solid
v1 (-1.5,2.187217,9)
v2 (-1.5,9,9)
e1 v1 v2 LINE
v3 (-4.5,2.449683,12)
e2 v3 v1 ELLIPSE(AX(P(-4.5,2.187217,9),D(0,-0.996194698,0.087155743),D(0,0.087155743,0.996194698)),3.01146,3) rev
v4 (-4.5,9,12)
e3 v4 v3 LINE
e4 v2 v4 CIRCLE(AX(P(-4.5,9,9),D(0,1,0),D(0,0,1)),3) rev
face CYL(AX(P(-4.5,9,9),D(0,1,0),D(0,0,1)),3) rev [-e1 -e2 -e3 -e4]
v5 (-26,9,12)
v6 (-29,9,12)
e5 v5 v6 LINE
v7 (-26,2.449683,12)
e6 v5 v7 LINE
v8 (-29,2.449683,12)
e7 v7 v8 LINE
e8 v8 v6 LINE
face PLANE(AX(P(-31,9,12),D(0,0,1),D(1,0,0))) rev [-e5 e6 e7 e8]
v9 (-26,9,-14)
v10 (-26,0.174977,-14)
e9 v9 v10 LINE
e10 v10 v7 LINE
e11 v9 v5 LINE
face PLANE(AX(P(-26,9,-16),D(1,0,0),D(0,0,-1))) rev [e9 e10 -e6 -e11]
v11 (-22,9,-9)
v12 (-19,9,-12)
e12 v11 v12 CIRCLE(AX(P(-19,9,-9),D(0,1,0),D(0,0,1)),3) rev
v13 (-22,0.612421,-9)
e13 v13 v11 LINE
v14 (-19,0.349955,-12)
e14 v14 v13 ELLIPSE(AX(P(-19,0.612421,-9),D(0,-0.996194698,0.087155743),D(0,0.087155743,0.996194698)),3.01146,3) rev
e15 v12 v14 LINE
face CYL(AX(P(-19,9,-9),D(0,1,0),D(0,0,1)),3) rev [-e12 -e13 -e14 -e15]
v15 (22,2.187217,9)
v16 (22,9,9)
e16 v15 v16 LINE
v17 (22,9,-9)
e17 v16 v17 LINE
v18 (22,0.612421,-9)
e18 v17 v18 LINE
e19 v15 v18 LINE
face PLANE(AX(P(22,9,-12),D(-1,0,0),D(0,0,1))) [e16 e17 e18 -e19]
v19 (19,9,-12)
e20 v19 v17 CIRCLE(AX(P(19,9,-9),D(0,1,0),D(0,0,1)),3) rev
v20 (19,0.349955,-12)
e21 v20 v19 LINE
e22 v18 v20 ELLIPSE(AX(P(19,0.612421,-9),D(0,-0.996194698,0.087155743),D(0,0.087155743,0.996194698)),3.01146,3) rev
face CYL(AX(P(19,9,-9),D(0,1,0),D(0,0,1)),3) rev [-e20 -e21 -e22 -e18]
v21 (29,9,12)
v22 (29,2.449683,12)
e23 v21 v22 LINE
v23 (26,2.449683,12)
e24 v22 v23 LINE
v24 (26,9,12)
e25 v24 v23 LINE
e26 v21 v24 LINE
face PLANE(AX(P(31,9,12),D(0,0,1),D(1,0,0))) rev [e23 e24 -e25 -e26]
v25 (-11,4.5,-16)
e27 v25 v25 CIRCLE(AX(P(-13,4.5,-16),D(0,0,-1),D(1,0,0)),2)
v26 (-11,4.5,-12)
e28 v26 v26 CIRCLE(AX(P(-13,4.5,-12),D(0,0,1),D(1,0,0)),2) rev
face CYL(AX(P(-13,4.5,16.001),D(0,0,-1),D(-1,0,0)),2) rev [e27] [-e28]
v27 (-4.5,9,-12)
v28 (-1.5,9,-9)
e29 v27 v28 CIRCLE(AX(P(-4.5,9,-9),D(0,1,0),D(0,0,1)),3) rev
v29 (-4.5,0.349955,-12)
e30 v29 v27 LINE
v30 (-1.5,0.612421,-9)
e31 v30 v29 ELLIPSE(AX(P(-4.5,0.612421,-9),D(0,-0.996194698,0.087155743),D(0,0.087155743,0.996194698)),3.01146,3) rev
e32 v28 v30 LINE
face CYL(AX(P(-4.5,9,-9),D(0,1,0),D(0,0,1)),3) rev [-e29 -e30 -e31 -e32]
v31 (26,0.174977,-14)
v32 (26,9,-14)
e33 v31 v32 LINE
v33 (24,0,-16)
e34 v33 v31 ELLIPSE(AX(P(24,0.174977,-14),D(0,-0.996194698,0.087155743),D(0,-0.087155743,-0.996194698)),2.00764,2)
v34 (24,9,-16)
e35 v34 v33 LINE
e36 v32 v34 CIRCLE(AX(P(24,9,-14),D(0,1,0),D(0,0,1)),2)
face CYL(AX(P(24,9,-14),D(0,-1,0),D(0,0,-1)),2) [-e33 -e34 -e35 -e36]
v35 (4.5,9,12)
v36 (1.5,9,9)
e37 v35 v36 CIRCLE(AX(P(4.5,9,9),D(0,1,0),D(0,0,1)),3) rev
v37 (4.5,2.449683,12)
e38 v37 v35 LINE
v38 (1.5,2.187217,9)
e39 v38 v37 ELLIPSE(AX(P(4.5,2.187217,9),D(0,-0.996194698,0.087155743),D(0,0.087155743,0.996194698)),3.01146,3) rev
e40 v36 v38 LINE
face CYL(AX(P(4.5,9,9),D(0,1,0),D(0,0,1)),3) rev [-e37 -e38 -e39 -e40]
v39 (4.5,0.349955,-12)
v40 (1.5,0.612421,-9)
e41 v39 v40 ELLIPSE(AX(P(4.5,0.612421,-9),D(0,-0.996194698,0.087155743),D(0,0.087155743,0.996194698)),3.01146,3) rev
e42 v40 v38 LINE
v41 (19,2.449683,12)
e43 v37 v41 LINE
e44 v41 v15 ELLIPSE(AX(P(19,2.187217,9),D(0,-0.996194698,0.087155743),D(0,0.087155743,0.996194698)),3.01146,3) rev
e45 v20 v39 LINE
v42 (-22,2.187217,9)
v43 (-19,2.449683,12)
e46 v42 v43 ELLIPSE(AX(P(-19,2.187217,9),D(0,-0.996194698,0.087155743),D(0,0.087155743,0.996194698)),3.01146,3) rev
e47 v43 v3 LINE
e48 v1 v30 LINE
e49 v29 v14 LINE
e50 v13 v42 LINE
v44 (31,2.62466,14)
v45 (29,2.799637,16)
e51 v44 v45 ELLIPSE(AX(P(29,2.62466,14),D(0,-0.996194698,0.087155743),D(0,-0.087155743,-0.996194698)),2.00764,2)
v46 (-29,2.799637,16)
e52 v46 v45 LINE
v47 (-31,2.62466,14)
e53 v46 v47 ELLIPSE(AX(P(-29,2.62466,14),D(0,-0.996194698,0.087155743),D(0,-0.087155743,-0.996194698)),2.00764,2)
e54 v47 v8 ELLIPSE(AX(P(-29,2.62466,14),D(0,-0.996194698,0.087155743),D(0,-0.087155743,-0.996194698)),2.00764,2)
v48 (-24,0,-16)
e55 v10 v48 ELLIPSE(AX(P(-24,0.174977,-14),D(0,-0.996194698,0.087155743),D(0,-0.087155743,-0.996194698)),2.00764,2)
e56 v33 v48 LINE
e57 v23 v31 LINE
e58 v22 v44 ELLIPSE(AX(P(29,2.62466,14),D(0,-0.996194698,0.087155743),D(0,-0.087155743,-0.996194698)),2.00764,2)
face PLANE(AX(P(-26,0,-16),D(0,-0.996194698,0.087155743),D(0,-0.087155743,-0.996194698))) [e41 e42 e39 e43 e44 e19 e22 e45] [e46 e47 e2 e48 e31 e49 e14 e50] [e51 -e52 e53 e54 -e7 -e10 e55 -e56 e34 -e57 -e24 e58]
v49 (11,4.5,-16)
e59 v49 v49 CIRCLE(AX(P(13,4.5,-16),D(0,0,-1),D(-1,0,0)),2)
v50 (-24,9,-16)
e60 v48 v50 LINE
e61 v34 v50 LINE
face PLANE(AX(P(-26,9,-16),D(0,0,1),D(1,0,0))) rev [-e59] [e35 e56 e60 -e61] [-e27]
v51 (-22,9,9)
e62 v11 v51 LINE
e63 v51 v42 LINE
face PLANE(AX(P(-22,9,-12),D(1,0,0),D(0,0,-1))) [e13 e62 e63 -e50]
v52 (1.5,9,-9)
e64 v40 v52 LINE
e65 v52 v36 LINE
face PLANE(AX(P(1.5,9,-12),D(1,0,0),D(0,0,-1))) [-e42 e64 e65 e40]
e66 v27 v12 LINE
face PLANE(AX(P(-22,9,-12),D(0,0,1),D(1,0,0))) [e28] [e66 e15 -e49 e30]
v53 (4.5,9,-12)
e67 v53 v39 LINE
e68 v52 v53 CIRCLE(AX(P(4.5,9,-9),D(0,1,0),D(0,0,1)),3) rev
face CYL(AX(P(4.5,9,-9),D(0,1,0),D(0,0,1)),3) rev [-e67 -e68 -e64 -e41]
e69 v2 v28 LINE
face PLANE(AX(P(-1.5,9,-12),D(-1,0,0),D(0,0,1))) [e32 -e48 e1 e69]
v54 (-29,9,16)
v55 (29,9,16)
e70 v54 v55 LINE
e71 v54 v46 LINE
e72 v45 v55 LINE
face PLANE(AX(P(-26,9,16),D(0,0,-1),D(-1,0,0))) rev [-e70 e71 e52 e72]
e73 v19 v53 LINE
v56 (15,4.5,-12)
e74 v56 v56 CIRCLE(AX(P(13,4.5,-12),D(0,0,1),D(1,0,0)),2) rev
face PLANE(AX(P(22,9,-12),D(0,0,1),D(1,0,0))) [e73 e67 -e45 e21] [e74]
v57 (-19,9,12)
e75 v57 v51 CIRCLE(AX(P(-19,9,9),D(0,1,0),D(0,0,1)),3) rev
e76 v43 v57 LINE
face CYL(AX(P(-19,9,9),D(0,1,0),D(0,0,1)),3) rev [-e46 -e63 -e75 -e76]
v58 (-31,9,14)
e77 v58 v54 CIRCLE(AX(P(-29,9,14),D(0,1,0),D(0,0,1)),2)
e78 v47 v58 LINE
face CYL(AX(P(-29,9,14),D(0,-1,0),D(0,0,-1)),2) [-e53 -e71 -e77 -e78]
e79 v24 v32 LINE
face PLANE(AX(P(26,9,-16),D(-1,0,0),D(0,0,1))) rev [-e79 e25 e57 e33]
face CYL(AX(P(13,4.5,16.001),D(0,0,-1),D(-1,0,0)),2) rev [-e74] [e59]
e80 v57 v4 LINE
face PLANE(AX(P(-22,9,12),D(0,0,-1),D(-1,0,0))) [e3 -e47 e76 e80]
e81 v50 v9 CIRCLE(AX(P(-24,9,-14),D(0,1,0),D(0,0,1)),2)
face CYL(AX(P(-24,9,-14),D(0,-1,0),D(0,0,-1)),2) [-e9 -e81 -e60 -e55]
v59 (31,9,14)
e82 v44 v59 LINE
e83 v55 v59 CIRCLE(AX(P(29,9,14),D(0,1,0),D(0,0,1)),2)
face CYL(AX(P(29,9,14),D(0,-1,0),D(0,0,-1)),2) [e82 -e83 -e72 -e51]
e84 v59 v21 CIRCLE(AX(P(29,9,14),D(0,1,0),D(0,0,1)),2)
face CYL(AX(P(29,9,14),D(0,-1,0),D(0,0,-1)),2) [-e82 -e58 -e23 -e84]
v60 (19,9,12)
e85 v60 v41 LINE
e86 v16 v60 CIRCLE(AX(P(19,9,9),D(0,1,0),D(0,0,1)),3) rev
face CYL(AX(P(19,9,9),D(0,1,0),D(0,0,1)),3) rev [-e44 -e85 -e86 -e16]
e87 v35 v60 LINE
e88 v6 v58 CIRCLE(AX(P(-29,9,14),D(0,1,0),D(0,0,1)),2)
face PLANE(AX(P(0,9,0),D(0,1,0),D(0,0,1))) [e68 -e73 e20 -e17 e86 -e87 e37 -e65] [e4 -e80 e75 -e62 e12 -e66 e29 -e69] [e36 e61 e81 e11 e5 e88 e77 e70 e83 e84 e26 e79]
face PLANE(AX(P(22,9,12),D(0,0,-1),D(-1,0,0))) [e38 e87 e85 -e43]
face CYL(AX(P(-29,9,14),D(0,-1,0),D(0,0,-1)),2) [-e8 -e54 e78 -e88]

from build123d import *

# Parameters (mm, degrees)
SKETCH1_W           = 20.5
SKETCH1_H           = 24
BOSS_EXTRUDE1_DEPTH = 9
FILLET1_R           = 3
FILLET2_R           = 2
CUT_EXTRUDE1_REACH  = 47.453
SKETCH2_R           = 2
DRAFT1_START        = -1.394491884
DRAFT1_OUTLINE_W    = 64
DRAFT1_OUTLINE_H    = 35
DRAFT1_DEPTH        = 2.788983768


# Read off the part's stored shape, not the designer's step: Draft1
with BuildPart() as part:
    # Sketch1 → Boss-Extrude1 (new body)
    with BuildSketch(Plane(origin=(0, 0, 0), x_dir=(1, 0, 0), z_dir=(0, 1, 0))):
        Polygon((-26, 16), (26, 16), (26, -12), (31, -12), (31, -16), (26, -16), (-26, -16), (-31, -16), (-31, -12), (-26, -12), align=None)
        with Locations((-11.75, 0)):
            Rectangle(SKETCH1_W, SKETCH1_H, mode=Mode.SUBTRACT)
        with Locations((11.75, 0)):
            Rectangle(SKETCH1_W, SKETCH1_H, mode=Mode.SUBTRACT)
    extrude(amount=BOSS_EXTRUDE1_DEPTH)

    # Fillet1
    fillet1_edges = [part.edges().sort_by_distance(p)[0] for p in [
        (-1.5, 4.5, 12),
        (-1.5, 4.5, -12),
        (-22, 4.5, -12),
        (-22, 4.5, 12),
        (22, 4.5, 12),
        (22, 4.5, -12),
        (1.5, 4.5, -12),
        (1.5, 4.5, 12),
    ]]
    fillet(fillet1_edges, radius=FILLET1_R)

    # Fillet2
    fillet2_edges = [part.edges().sort_by_distance(p)[0] for p in [
        (-26, 4.5, -16),
        (26, 4.5, -16),
        (31, 4.5, 16),
        (31, 4.5, 12),
        (-31, 4.5, 12),
        (-31, 4.5, 16),
    ]]
    fillet(fillet2_edges, radius=FILLET2_R - 0.0001)  # a hair under: the kernel refuses the full size

    # Sketch2 → Cut-Extrude1 (cut, up to next)
    with BuildSketch(Plane(origin=(0, 0, -16), x_dir=(-1, 0, 0), z_dir=(0, 0, -1)), mode=Mode.PRIVATE) as cut_extrude1_sk1:
        with Locations((-13, 4.5)):
            Circle(SKETCH2_R)
    cut_extrude1_tool1 = extrude(cut_extrude1_sk1.sketch, amount=-CUT_EXTRUDE1_REACH, mode=Mode.PRIVATE) & part.part
    # Sketch2 → Cut-Extrude1 (cut, up to next)
    with BuildSketch(Plane(origin=(0, 0, -16), x_dir=(-1, 0, 0), z_dir=(0, 0, -1)), mode=Mode.PRIVATE) as cut_extrude1_sk2:
        with Locations(Location((13, 4.5, 0), (0, 0, 180))):
            Circle(SKETCH2_R)
    cut_extrude1_tool2 = extrude(cut_extrude1_sk2.sketch, amount=-CUT_EXTRUDE1_REACH, mode=Mode.PRIVATE) & part.part
    add(cut_extrude1_tool1.solids().sort_by_distance((13, 4.5, -16))[0], mode=Mode.SUBTRACT)
    add(cut_extrude1_tool2.solids().sort_by_distance((-13, 4.5, -16))[0], mode=Mode.SUBTRACT)

    # Draft1 outline → Draft1 (cut)
    with BuildSketch(Plane(origin=(0, 0, 0), x_dir=(1, 0, 0), z_dir=(0, 0.9961946980917455, -0.08715574274765824)).offset(DRAFT1_START)):
        with Locations((0, -0.5)):
            Rectangle(DRAFT1_OUTLINE_W, DRAFT1_OUTLINE_H)
    extrude(amount=DRAFT1_DEPTH, mode=Mode.SUBTRACT)


solid = part.part
